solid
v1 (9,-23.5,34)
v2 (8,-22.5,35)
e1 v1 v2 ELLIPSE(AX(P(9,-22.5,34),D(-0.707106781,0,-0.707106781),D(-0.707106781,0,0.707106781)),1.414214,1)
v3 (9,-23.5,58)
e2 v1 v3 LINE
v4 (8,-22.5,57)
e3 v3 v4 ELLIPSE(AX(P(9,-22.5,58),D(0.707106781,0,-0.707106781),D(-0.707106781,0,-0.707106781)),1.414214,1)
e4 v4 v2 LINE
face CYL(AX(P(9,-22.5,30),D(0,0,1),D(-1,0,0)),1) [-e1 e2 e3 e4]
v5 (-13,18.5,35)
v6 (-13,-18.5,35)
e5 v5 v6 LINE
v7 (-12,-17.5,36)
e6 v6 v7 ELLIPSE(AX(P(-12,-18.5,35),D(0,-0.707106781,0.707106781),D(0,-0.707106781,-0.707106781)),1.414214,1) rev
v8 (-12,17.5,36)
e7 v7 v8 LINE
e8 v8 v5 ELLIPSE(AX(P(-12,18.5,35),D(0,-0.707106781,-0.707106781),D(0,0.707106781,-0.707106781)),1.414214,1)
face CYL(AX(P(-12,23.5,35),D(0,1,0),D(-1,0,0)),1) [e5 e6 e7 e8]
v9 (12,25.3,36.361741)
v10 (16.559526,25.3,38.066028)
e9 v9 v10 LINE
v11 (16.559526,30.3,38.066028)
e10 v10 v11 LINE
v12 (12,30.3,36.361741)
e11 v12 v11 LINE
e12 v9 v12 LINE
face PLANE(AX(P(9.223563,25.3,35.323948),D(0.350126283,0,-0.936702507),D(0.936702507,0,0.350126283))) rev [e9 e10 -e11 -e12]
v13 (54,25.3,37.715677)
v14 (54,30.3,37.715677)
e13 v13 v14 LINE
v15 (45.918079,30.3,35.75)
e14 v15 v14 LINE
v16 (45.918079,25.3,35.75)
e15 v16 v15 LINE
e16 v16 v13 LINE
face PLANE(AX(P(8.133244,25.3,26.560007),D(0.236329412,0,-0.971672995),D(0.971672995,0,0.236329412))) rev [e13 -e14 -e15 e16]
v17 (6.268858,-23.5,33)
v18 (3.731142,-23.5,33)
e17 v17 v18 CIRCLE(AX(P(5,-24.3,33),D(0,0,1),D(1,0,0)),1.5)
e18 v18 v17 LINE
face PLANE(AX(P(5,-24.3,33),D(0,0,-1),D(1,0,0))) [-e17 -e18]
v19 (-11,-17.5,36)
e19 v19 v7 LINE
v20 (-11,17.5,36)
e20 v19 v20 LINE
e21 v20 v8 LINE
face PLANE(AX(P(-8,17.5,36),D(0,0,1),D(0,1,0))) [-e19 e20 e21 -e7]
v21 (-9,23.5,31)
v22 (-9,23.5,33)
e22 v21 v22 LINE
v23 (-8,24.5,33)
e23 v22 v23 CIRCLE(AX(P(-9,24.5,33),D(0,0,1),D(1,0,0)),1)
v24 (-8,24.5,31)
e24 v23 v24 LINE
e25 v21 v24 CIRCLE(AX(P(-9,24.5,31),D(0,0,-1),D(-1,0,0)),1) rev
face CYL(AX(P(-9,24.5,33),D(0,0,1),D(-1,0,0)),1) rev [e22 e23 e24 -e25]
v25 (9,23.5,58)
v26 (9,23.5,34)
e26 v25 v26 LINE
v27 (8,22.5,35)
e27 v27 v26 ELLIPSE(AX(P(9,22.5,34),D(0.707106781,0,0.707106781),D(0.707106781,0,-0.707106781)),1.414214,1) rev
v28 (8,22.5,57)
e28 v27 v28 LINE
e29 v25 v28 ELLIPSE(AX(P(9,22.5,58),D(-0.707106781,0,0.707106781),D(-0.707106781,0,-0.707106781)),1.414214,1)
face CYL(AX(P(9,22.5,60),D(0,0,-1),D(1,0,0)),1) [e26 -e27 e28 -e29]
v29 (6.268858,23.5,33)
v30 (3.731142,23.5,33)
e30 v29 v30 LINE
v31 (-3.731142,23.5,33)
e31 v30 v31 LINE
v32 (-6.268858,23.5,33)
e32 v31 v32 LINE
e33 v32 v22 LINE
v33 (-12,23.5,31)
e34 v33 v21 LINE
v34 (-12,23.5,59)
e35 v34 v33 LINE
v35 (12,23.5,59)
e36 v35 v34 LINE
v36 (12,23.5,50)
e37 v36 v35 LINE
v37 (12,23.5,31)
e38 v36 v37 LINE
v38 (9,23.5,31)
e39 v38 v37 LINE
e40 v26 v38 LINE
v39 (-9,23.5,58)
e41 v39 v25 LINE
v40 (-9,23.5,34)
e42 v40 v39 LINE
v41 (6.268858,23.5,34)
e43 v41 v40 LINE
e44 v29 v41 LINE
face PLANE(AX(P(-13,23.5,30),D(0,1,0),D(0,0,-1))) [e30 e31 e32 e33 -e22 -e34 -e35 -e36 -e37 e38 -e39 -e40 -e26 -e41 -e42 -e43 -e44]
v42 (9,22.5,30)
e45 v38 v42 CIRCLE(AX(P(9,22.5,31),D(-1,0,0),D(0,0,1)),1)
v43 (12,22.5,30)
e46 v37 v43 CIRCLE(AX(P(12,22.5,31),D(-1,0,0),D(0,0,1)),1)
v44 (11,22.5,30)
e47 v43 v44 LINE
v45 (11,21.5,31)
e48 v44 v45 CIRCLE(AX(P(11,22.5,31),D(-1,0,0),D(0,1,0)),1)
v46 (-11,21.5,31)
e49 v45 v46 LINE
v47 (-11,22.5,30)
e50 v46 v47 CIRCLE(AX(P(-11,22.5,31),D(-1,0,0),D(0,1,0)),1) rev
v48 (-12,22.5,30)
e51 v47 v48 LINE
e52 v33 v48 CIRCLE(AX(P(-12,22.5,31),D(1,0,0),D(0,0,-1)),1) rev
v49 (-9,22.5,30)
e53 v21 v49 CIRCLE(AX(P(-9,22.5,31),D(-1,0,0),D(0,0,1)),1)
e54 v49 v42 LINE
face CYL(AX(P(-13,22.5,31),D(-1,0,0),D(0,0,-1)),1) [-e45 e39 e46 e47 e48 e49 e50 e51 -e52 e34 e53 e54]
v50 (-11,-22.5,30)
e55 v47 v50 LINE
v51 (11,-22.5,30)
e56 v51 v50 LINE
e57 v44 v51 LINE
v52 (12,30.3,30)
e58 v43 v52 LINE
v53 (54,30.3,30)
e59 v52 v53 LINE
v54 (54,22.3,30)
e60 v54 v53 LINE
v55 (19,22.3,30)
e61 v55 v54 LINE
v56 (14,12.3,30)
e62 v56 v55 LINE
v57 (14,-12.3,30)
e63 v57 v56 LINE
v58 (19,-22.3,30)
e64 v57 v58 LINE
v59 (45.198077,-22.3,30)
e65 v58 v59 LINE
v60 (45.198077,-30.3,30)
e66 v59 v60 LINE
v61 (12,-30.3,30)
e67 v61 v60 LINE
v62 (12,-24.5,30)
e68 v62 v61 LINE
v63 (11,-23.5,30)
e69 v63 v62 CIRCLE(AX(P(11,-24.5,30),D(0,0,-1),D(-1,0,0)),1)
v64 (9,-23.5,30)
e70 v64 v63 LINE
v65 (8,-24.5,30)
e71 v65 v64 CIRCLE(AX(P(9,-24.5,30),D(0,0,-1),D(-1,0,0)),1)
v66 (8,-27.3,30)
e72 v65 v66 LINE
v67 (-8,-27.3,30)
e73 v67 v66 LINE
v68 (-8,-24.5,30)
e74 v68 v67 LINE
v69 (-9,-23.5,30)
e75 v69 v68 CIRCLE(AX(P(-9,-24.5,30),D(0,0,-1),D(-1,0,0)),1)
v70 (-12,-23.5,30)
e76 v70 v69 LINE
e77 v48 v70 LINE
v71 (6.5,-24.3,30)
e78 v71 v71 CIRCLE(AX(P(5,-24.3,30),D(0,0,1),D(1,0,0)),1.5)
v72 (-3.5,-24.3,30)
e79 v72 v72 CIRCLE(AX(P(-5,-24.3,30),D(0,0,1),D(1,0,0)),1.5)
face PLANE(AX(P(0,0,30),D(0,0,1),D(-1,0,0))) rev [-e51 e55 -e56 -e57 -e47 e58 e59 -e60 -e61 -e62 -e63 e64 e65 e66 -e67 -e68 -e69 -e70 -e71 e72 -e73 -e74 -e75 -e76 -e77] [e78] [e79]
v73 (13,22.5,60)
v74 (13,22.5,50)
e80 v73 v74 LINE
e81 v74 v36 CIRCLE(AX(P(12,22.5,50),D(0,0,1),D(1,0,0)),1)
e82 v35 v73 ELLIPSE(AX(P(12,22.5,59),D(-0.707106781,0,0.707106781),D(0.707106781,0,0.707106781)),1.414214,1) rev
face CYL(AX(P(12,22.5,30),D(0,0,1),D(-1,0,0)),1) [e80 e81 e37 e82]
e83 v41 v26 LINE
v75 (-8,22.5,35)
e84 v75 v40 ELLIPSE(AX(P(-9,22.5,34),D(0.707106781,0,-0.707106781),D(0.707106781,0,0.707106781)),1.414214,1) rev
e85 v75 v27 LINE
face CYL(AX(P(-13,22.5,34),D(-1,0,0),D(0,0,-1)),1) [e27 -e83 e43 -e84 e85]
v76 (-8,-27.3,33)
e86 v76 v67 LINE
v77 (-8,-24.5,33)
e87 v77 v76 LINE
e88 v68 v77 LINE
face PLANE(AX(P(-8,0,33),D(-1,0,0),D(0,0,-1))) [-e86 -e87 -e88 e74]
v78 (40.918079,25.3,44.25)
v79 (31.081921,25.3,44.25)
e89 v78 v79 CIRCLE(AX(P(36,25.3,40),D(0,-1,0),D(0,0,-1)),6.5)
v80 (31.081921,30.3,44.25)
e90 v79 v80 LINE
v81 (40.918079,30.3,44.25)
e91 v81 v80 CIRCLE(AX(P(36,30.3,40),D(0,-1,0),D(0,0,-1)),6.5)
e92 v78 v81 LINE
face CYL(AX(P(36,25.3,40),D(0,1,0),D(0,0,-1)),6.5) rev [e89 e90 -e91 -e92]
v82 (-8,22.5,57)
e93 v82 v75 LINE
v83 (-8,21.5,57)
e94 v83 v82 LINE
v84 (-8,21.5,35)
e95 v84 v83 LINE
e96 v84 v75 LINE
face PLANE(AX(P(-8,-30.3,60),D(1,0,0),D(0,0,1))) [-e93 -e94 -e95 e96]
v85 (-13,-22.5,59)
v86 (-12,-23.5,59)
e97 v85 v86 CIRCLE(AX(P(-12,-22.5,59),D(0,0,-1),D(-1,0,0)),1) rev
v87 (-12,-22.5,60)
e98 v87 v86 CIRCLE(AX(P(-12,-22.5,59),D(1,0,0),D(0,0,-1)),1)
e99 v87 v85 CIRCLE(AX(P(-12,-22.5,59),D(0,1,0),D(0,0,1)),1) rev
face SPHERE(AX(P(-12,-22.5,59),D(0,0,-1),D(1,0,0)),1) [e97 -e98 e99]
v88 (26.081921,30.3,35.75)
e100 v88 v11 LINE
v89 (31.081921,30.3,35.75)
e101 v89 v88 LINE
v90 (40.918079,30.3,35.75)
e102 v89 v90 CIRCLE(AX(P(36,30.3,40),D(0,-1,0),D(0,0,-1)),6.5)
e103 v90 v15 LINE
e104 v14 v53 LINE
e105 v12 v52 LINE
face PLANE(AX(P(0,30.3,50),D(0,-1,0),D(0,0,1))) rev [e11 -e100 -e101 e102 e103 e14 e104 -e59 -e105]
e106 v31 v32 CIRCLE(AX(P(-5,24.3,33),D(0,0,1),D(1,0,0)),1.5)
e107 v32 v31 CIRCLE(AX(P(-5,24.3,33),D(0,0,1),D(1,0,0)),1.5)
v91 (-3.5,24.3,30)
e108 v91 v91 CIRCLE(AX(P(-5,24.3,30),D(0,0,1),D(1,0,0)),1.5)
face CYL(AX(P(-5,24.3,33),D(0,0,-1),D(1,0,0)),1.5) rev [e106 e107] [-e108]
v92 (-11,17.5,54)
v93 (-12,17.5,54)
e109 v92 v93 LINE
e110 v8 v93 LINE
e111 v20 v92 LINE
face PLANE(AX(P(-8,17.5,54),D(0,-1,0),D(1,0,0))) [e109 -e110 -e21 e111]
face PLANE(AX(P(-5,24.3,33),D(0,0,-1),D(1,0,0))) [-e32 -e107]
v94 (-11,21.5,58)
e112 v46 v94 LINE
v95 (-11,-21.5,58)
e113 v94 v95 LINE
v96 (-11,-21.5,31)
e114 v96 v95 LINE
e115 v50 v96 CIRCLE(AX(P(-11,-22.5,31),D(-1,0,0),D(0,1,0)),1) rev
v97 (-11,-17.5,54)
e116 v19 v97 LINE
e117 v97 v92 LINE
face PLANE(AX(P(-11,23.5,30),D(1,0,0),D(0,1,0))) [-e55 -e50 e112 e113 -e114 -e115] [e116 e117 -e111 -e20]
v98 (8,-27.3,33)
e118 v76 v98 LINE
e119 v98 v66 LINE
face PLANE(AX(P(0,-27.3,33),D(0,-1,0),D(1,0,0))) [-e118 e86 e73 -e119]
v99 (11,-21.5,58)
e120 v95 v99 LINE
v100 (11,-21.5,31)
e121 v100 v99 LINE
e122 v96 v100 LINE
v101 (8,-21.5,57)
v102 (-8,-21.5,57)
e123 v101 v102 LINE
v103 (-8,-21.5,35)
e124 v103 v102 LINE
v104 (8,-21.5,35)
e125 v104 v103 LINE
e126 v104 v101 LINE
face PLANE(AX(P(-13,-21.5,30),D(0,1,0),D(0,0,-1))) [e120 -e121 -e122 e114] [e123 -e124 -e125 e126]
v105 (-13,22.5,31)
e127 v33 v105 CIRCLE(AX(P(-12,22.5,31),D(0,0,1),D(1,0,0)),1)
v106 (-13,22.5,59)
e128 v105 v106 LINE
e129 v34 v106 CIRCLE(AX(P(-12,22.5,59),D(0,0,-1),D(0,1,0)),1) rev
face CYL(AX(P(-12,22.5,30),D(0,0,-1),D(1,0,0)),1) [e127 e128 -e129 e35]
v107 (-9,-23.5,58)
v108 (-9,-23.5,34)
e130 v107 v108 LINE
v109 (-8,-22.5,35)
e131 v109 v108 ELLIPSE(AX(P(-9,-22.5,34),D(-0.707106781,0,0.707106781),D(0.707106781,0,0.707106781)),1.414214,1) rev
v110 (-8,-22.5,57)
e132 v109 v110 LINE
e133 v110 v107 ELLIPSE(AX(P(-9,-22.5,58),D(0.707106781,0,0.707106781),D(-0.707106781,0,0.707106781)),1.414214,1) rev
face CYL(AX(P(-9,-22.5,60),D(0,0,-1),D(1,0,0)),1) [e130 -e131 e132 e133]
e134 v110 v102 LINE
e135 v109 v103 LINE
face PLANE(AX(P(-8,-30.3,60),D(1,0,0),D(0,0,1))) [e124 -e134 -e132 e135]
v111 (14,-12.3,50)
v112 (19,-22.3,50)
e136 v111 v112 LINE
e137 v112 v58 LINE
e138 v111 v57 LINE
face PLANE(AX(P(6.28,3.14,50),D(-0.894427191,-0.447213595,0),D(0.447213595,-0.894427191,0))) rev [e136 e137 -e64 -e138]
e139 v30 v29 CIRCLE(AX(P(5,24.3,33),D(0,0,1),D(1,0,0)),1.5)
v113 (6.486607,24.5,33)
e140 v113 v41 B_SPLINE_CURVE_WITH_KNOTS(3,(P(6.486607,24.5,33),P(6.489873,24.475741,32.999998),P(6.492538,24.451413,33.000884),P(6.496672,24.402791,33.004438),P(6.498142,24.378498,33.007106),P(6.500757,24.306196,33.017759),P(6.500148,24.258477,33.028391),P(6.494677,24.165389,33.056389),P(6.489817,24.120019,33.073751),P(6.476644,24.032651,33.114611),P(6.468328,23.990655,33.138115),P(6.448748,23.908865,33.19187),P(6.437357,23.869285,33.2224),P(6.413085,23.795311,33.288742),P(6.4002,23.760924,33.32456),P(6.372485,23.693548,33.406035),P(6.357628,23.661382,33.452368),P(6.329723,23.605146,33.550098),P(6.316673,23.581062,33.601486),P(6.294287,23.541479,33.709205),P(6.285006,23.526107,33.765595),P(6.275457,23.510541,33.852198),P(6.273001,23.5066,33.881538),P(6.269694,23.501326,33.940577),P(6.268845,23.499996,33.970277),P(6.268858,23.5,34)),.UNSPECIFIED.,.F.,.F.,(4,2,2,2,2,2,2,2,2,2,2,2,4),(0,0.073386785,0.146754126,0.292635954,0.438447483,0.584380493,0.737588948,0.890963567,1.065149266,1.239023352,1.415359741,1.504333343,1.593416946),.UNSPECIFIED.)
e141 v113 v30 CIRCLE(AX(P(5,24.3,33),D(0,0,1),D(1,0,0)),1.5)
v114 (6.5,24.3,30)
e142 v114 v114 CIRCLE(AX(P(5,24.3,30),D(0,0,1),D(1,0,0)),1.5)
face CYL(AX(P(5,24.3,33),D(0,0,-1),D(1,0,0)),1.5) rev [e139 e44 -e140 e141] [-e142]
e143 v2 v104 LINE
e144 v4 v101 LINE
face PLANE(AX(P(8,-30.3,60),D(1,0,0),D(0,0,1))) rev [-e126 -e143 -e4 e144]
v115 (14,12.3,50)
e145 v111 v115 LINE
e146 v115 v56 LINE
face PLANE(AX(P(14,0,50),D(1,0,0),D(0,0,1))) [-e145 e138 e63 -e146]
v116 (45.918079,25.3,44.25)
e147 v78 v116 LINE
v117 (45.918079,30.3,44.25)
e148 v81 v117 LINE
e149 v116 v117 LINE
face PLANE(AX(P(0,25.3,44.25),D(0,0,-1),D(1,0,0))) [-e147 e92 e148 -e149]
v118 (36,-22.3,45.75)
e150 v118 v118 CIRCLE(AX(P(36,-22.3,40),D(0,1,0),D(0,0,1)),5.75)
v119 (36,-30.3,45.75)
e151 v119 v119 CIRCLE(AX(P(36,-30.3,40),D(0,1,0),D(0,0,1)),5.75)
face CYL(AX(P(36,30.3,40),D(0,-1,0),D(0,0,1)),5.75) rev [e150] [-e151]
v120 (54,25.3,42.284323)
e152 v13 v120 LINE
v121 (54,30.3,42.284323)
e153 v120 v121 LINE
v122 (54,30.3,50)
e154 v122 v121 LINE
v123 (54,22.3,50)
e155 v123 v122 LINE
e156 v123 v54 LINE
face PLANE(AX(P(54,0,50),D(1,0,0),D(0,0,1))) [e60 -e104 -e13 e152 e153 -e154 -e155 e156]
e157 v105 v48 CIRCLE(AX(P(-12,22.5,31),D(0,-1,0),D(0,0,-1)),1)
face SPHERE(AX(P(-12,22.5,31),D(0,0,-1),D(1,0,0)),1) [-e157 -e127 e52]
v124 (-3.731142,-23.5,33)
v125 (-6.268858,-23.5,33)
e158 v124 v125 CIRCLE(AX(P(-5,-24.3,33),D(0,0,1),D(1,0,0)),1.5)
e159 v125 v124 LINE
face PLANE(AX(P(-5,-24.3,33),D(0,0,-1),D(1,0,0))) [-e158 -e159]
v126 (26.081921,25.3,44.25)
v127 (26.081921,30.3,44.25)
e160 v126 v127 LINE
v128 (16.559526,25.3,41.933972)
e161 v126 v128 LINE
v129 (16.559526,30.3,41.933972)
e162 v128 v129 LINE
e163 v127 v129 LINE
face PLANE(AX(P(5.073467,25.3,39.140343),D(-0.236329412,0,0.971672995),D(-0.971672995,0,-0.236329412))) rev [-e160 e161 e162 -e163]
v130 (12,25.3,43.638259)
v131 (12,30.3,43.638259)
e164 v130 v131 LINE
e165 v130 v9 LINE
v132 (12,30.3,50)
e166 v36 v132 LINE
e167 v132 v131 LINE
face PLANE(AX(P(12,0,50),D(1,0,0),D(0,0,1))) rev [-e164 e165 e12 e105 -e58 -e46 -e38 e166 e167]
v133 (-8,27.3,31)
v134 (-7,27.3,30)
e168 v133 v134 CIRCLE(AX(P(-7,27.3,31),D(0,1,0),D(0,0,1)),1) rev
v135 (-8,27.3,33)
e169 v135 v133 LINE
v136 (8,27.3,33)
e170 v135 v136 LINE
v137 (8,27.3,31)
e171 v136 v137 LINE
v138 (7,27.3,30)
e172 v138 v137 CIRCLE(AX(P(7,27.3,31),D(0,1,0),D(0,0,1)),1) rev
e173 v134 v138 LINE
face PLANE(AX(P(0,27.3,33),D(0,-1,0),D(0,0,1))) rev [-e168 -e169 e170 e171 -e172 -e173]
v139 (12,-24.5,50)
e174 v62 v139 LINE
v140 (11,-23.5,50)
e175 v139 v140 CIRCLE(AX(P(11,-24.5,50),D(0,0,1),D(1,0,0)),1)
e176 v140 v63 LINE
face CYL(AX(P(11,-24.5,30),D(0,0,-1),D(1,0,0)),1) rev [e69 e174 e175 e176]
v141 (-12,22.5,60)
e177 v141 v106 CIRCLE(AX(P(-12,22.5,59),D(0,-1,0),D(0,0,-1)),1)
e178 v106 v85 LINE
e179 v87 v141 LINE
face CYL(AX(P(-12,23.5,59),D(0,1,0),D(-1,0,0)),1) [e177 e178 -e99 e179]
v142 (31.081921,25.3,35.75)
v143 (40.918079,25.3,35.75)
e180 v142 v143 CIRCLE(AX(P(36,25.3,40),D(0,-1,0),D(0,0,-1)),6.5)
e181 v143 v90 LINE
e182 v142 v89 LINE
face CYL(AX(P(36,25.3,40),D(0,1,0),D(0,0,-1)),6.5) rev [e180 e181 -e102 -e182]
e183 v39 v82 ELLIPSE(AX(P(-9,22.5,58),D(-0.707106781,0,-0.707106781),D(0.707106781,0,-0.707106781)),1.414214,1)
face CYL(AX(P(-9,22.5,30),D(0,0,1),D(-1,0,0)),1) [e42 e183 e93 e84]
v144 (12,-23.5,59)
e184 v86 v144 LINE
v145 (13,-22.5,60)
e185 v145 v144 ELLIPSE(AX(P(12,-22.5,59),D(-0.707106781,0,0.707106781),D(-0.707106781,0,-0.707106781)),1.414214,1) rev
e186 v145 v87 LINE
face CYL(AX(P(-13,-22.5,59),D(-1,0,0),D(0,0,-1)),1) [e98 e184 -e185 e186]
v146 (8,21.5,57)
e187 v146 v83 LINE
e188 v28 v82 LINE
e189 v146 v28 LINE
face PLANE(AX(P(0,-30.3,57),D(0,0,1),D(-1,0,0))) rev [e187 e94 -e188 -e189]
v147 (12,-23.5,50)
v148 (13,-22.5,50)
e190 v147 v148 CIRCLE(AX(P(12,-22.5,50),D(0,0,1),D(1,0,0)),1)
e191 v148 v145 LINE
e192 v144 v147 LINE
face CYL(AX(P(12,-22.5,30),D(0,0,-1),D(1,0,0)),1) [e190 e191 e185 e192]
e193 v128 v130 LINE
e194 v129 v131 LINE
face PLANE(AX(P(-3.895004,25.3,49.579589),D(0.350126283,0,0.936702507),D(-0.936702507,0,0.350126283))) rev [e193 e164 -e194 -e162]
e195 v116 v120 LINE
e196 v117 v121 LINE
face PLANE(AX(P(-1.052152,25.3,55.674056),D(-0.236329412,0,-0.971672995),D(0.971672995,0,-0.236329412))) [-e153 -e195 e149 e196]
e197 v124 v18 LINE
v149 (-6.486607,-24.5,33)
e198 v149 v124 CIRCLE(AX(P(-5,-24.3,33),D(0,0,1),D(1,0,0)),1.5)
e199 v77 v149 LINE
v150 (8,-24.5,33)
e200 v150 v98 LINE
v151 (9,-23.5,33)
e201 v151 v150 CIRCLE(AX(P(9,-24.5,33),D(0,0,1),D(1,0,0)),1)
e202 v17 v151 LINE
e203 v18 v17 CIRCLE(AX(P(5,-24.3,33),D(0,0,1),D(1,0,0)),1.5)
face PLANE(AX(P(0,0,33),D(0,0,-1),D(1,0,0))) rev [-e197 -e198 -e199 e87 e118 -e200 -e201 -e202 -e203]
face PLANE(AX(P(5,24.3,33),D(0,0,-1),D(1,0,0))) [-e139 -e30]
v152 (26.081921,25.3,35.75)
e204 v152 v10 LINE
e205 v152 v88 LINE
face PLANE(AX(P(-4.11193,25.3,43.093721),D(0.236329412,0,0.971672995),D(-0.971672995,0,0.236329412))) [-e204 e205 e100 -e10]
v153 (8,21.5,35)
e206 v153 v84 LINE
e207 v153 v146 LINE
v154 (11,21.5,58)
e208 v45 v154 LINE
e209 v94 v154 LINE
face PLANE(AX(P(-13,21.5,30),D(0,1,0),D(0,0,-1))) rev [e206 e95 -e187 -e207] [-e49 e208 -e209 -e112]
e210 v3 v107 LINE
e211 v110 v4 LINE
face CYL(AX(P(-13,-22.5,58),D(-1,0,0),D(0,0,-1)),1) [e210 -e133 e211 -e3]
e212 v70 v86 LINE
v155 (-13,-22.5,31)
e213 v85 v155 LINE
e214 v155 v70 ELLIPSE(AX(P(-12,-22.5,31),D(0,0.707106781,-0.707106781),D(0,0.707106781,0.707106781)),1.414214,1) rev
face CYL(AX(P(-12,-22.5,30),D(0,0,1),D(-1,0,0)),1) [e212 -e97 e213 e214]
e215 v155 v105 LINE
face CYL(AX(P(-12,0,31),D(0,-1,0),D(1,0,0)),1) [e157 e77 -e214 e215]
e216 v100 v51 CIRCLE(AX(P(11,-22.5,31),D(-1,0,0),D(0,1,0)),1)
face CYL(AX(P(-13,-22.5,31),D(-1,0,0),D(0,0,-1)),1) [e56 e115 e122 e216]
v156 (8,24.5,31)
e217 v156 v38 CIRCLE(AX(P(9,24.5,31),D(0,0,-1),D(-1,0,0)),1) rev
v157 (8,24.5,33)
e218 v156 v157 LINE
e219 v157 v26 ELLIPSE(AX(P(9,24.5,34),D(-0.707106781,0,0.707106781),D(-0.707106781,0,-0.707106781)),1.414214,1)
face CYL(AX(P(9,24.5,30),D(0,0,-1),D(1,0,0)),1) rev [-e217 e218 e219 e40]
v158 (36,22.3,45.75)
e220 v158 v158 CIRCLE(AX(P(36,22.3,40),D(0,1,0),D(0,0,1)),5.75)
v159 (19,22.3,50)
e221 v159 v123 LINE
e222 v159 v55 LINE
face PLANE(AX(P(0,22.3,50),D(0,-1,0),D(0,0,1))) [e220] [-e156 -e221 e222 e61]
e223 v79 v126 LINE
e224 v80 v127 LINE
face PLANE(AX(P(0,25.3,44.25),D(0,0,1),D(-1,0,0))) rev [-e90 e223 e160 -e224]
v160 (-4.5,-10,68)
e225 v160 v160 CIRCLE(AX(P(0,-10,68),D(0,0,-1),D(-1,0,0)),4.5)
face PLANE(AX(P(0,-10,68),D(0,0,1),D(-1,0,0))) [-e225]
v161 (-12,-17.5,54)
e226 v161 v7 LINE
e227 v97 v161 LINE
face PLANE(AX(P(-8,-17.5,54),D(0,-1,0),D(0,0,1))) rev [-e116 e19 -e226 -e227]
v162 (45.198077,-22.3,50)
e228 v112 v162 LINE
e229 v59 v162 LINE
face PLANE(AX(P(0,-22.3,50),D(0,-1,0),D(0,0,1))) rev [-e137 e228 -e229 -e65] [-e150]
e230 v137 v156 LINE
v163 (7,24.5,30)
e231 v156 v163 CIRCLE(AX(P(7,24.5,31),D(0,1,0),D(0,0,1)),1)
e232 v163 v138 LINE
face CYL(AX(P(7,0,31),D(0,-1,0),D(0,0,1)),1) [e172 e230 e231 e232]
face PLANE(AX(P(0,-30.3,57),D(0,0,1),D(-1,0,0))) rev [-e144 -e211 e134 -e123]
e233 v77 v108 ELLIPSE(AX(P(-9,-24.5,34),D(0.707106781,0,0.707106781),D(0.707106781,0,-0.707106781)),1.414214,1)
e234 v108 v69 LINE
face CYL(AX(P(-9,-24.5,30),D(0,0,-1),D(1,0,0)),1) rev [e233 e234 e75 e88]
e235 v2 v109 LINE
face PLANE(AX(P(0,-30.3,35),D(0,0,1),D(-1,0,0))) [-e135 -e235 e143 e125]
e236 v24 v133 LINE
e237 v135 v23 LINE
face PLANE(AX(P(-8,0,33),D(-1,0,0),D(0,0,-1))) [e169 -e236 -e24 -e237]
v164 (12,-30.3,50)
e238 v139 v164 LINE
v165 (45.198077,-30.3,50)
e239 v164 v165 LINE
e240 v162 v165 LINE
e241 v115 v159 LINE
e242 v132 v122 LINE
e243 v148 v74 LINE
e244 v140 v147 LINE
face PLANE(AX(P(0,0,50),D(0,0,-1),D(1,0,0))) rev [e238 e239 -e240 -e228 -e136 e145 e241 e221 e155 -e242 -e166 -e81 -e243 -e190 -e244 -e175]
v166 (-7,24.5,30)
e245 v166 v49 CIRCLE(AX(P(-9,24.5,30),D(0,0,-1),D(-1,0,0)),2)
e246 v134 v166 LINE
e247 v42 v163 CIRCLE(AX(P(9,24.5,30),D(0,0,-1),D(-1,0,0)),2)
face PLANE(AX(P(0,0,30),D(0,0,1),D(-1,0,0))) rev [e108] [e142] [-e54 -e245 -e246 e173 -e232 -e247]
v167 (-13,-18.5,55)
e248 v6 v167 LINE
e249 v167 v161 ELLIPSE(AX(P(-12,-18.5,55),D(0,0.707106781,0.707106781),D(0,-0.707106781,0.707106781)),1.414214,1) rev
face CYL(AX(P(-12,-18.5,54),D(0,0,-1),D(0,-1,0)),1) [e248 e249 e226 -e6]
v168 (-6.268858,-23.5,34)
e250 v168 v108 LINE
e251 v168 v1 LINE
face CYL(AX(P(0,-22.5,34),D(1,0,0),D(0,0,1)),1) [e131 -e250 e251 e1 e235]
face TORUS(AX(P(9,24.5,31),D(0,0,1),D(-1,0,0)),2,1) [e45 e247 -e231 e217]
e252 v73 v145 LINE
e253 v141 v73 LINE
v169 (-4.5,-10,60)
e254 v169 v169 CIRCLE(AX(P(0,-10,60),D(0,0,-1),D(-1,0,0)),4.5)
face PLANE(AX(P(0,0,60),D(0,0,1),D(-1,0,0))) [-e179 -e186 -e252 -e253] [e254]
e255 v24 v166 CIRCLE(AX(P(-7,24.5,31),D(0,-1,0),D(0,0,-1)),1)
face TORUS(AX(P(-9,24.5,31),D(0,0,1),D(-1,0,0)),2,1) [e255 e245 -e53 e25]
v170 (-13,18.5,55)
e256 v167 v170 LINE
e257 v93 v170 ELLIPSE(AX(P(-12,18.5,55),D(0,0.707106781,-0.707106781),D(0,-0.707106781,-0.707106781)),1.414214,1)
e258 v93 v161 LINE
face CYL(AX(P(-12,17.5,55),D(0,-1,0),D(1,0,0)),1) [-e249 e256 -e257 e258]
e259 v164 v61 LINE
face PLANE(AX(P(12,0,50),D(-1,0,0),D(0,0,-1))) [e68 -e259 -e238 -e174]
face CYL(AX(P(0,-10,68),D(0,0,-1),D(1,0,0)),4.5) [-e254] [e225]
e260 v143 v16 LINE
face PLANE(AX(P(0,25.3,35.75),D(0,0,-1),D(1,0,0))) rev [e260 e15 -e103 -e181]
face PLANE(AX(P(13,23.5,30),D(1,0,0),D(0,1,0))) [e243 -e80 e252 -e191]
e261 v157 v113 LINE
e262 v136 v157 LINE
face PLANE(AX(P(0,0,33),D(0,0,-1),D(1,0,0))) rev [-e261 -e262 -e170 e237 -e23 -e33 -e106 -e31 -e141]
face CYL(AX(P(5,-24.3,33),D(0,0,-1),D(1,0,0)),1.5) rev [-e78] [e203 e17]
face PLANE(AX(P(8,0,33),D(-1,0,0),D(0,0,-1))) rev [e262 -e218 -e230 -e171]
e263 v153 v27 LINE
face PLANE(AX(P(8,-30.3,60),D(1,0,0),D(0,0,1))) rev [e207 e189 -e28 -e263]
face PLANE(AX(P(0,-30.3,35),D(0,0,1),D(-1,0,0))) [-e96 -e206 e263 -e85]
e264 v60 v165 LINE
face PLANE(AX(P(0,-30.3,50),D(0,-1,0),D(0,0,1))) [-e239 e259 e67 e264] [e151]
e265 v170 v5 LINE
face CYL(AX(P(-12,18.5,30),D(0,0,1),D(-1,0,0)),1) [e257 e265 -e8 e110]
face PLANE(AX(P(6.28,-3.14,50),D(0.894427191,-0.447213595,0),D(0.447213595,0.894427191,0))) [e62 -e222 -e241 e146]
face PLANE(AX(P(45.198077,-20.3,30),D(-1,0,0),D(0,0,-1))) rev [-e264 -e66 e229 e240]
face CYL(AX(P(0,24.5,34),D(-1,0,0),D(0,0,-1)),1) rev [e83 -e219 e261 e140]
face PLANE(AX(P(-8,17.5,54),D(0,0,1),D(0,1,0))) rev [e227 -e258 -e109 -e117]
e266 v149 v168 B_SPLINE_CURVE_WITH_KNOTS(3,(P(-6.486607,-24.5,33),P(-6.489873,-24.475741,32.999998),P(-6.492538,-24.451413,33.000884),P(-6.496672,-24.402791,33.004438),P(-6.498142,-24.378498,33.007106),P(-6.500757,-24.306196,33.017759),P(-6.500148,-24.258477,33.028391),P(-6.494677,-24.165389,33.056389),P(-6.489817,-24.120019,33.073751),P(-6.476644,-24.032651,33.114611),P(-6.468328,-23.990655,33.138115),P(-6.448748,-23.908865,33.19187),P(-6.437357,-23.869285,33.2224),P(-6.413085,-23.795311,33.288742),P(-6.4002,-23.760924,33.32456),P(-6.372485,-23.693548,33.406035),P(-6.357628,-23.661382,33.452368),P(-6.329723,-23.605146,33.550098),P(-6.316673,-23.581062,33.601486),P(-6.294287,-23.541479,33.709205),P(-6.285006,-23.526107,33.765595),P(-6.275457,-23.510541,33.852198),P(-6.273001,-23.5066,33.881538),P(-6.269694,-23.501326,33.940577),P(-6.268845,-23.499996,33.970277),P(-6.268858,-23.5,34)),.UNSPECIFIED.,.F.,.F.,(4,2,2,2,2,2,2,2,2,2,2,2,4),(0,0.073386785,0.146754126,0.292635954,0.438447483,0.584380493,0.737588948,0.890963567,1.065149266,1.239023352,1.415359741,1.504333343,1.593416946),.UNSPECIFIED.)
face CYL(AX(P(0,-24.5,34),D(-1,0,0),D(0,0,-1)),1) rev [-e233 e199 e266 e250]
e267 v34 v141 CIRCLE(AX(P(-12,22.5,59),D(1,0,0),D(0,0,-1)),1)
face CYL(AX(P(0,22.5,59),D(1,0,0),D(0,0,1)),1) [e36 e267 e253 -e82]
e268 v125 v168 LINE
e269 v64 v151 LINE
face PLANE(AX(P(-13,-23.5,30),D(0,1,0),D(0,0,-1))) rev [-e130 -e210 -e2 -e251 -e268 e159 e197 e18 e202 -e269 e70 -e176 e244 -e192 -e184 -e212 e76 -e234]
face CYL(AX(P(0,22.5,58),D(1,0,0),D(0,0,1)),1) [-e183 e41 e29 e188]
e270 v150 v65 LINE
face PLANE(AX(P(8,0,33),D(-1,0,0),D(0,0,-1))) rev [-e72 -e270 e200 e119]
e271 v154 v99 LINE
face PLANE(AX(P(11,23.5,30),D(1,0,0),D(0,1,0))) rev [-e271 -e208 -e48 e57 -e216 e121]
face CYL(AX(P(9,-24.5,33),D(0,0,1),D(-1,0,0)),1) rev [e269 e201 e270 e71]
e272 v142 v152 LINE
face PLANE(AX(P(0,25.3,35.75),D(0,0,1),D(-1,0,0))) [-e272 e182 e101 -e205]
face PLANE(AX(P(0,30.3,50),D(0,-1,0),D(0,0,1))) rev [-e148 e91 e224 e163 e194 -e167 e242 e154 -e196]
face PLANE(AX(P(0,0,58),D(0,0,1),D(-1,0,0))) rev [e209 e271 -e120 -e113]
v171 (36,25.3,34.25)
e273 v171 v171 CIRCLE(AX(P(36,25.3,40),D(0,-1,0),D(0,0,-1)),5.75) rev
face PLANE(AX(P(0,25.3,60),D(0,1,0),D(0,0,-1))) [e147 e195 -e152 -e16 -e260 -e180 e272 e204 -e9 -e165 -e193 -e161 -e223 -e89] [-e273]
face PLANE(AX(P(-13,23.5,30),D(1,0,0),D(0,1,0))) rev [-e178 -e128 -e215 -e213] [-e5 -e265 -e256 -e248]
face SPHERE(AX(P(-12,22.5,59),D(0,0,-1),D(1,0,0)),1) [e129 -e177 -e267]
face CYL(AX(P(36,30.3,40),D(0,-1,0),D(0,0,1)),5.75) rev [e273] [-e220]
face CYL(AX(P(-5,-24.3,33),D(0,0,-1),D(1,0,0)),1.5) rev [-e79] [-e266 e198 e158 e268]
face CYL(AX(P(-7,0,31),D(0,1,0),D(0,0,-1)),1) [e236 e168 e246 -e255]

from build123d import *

# Parameters (mm, degrees)
SKETCH1_W               = 26
SKETCH1_H               = 47
BOSS_EXTRUDE1_DEPTH     = 30
SHELL1_T                = -2
SKETCH2_W               = 10
SKETCH2_H               = 0.8
BOSS_EXTRUDE2_DEPTH     = 3
SKETCH3_R               = 1.5
CUT_EXTRUDE1_DEPTH      = 3
BOSS_EXTRUDE3_DEPTH     = 20
CUT_EXTRUDE2_DEPTH      = 82.134209801
CUT_EXTRUDE2_DEPTH_BACK = 82.134209801
SKETCH6_R               = 4.5
BOSS_EXTRUDE4_DEPTH     = 8
CUT_EXTRUDE3_DEPTH      = 82.917275345
CUT_EXTRUDE3_DEPTH_BACK = 82.917275345
SKETCH9_R               = 5.75
CUT_EXTRUDE4_DEPTH      = 5
SKETCH10_W              = 18
SKETCH10_H              = 35
CUT_EXTRUDE5_DEPTH      = 5
FILLET1_R               = 1
FILLET2_R               = 1
FILLET3_R               = 1
FILLET5_R               = 1
FILLET6_R               = 1
SKETCH11_W              = 8.801922924
SKETCH11_H              = 20
CUT_EXTRUDE6_DEPTH      = 10
SKETCH12_R              = 109.313079142
CUT_EXTRUDE7_DEPTH      = 73.650464555


# Some blends are built 0.0001 mm under size
with BuildPart() as part:
    # Sketch1 → Boss-Extrude1 (new body)
    with BuildSketch(Plane.XY):
        Rectangle(SKETCH1_W, SKETCH1_H)
    extrude(amount=BOSS_EXTRUDE1_DEPTH)

    # Shell1
    shell1_openings = [part.faces().sort_by_distance(p)[0] for p in [
        (0, 0, 30),
    ]]
    offset(amount=SHELL1_T, openings=shell1_openings, kind=Kind.INTERSECTION)

    # Sketch2 → Boss-Extrude2 (add)
    with BuildSketch(Plane.XY.offset(30)):
        Polygon((-5, 23.5), (-5, 24.3), (5, 24.3), (5, 23.5), (8, 23.5), (8, 27.3), (-8, 27.3), (-8, 23.5), align=None)
        with Locations((0, 23.9)):
            Rectangle(SKETCH2_W, SKETCH2_H)
        Polygon((-5, -24.3), (-5, -23.5), (-8, -23.5), (-8, -27.3), (8, -27.3), (8, -23.5), (5, -23.5), (5, -24.3), align=None)
        with Locations((0, -23.9)):
            Rectangle(SKETCH2_W, SKETCH2_H)
    extrude(amount=-BOSS_EXTRUDE2_DEPTH)

    # Sketch3 → Cut-Extrude1 (cut)
    with BuildSketch(Plane.XY.offset(30)):
        with Locations((-5, -24.3)):
            Circle(SKETCH3_R)
        with Locations((5, -24.3)):
            Circle(SKETCH3_R)
        with Locations((5, 24.3)):
            Circle(SKETCH3_R)
        with Locations((-5, 24.3)):
            Circle(SKETCH3_R)
    extrude(amount=-CUT_EXTRUDE1_DEPTH, mode=Mode.SUBTRACT)

    # Sketch4 → Boss-Extrude3 (add)
    with BuildSketch(Plane.XY.offset(30)):
        Polygon((13, 23.5), (13, -23.5), (12, -23.5), (12, -30.3), (54, -30.3), (54, -22.3), (19, -22.3), (14, -12.3), (14, 12.3), (19, 22.3), (54, 22.3), (54, 30.3), (12, 30.3), (12, 23.5), align=None)
    extrude(amount=-BOSS_EXTRUDE3_DEPTH)

    # Sketch5 → Cut-Extrude2 (cut, two sides: drawn at the far end of the back side and taken through both)
    with BuildSketch(Plane(origin=(0, 22.3, 0), x_dir=(-1, 0, 0), z_dir=(0, -1, 0)).offset(-CUT_EXTRUDE2_DEPTH_BACK)):
        with BuildLine():
            ThreePointArc((-36, -14.25), (-41.75, -20), (-36, -25.75))
            Line((-36, -25.75), (-36, -14.25))
        make_face()
        with BuildLine():
            Line((-36, -14.25), (-36, -25.75))
            ThreePointArc((-36, -25.75), (-31.934136008, -24.065863992), (-30.25, -20))
            ThreePointArc((-30.25, -20), (-31.934136008, -15.934136008), (-36, -14.25))
        make_face()
    extrude(amount=CUT_EXTRUDE2_DEPTH + CUT_EXTRUDE2_DEPTH_BACK, mode=Mode.SUBTRACT)

    # Sketch6 → Boss-Extrude4 (add)
    with BuildSketch(Plane(origin=(0, 0, 0), x_dir=(-1, 0, 0), z_dir=(0, 0, -1))):
        with Locations((0, -10)):
            Circle(SKETCH6_R)
    extrude(amount=BOSS_EXTRUDE4_DEPTH)

    # Sketch7 → Cut-Extrude3 (cut, two sides: drawn at the far end of the back side and taken through both)
    with BuildSketch(Plane(origin=(0, 23.5, 0), x_dir=(1, 0, 0), z_dir=(0, 1, 0)).offset(-CUT_EXTRUDE3_DEPTH_BACK)):
        Polygon((-8, -25), (8, -25), (8, -23), (8, -5), (8, -3), (-8, -3), (-8, -5), (-8, -23), align=None)
    extrude(amount=CUT_EXTRUDE3_DEPTH + CUT_EXTRUDE3_DEPTH_BACK, mode=Mode.SUBTRACT)

    # Sketch9 → Cut-Extrude4 (cut)
    with BuildSketch(Plane(origin=(0, 30.3, 0), x_dir=(1, 0, 0), z_dir=(0, 1, 0))):
        with BuildLine():
            Line((31.081921107, -15.75), (26.081921107, -15.75))
            Line((26.081921107, -15.75), (16.559525756, -18.066028235))
            Line((16.559525756, -18.066028235), (12, -16.361741342))
            Line((12, -16.361741342), (12, -23.638258658))
            Line((12, -23.638258658), (16.559525756, -21.933971765))
            Line((16.559525756, -21.933971765), (26.081921107, -24.25))
            Line((26.081921107, -24.25), (31.081921107, -24.25))
            ThreePointArc((31.081921107, -24.25), (36, -26.5), (40.918078893, -24.25))
            Line((40.918078893, -24.25), (45.918078893, -24.25))
            Line((45.918078893, -24.25), (54, -22.284322585))
            Line((54, -22.284322585), (54, -17.715677415))
            Line((54, -17.715677415), (45.918078893, -15.75))
            Line((45.918078893, -15.75), (40.918078893, -15.75))
            ThreePointArc((40.918078893, -15.75), (36, -13.5), (31.081921107, -15.75))
        make_face()
        with Locations(Location((36, -20, 0), (0, 0, 90))):
            Circle(SKETCH9_R, mode=Mode.SUBTRACT)
    extrude(amount=-CUT_EXTRUDE4_DEPTH, mode=Mode.SUBTRACT)

    # Sketch10 → Cut-Extrude5 (cut)
    with BuildSketch(Plane.ZY.offset(13)):
        with Locations((15, 0)):
            Rectangle(SKETCH10_W, SKETCH10_H)
    extrude(amount=-CUT_EXTRUDE5_DEPTH, mode=Mode.SUBTRACT)

    # Fillet1
    fillet1_edges = [part.edges().sort_by_distance(p)[0] for p in [
        (0, -21.5, 30),
        (-13, 17.5, 15),
        (-13, 0, 24),
        (-13, 0, 6),
        (-13, -17.5, 15),
    ]]
    fillet(fillet1_edges, radius=FILLET1_R)

    # Fillet2
    # the kernel refuses this fillet: 1 mm, written as the material it adds along each edge
    with BuildSketch(Plane(origin=(8, 23.5, 30), x_dir=(1, 0, 0), z_dir=(0, 0, -1))) as fillet2_piece_1:
        with BuildLine():
            CenterArc((FILLET2_R, -FILLET2_R), FILLET2_R, 90, 90)
            Line((0, -FILLET2_R), (-FILLET2_R * 0.02, -FILLET2_R))
            Line((-FILLET2_R * 0.02, -FILLET2_R), (-FILLET2_R * 0.02, FILLET2_R * 0.02))
            Line((-FILLET2_R * 0.02, FILLET2_R * 0.02), (FILLET2_R, FILLET2_R * 0.02))
            Line((FILLET2_R, FILLET2_R * 0.02), (FILLET2_R, 0))
        make_face()
    extrude(amount=3)
    with BuildSketch(Plane(origin=(-8, 23.5, 30), x_dir=(-1, 0, 0), z_dir=(0, 0, -1))) as fillet2_piece_2:
        with BuildLine():
            CenterArc((FILLET2_R, FILLET2_R), FILLET2_R, 180, 90)
            Line((0, FILLET2_R), (-FILLET2_R * 0.02, FILLET2_R))
            Line((-FILLET2_R * 0.02, FILLET2_R), (-FILLET2_R * 0.02, -FILLET2_R * 0.02))
            Line((-FILLET2_R * 0.02, -FILLET2_R * 0.02), (FILLET2_R, -FILLET2_R * 0.02))
            Line((FILLET2_R, -FILLET2_R * 0.02), (FILLET2_R, 0))
        make_face()
    extrude(amount=3)
    with BuildSketch(Plane(origin=(3.768857754, 23.5, 27), x_dir=(0, 0, -1), z_dir=(1, 0, 0))) as fillet2_piece_3_section:
        with BuildLine():
            CenterArc((FILLET2_R, FILLET2_R), FILLET2_R, 180, 90)
            Line((0, FILLET2_R), (-FILLET2_R * 0.02, FILLET2_R))
            Line((-FILLET2_R * 0.02, FILLET2_R), (-FILLET2_R * 0.02, -FILLET2_R * 0.02))
            Line((-FILLET2_R * 0.02, -FILLET2_R * 0.02), (FILLET2_R, -FILLET2_R * 0.02))
            Line((FILLET2_R, -FILLET2_R * 0.02), (FILLET2_R, 0))
        make_face()
    fillet2_piece_3 = extrude(amount=4.231142246, mode=Mode.PRIVATE)
    fillet2_piece_3 = split(fillet2_piece_3, bisect_by=Plane(origin=(7.179036581, 23.695460756, 27), z_dir=(0, 0, -1)), keep=Keep.TOP, mode=Mode.PRIVATE)
    fillet2_piece_3 = fillet2_piece_3 - Plane(origin=(5, 24.3, 26.747269996), x_dir=(1, 0, 0), z_dir=(0, 0, 1)) * Cylinder(1.5, 13, mode=Mode.PRIVATE)
    add(fillet2_piece_3)
    with BuildSketch(Plane(origin=(12, -23.5, 30), x_dir=(0, -1, 0), z_dir=(0, 0, -1))) as fillet2_piece_4:
        with BuildLine():
            CenterArc((FILLET2_R, FILLET2_R), FILLET2_R, 180, 90)
            Line((0, FILLET2_R), (-FILLET2_R * 0.02, FILLET2_R))
            Line((-FILLET2_R * 0.02, FILLET2_R), (-FILLET2_R * 0.02, -FILLET2_R * 0.02))
            Line((-FILLET2_R * 0.02, -FILLET2_R * 0.02), (FILLET2_R, -FILLET2_R * 0.02))
            Line((FILLET2_R, -FILLET2_R * 0.02), (FILLET2_R, 0))
        make_face()
    extrude(amount=20)
    with BuildSketch(Plane(origin=(8, 23.5, 30), x_dir=(1, 0, 0), z_dir=(0, 0, -1))) as fillet2_piece_5a_section:
        with BuildLine():
            CenterArc((FILLET2_R, -FILLET2_R), FILLET2_R, 90, 90)
            Line((0, -FILLET2_R), (-FILLET2_R * 0.02, -FILLET2_R))
            Line((-FILLET2_R * 0.02, -FILLET2_R), (-FILLET2_R * 0.02, FILLET2_R * 0.02))
            Line((-FILLET2_R * 0.02, FILLET2_R * 0.02), (FILLET2_R, FILLET2_R * 0.02))
            Line((FILLET2_R, FILLET2_R * 0.02), (FILLET2_R, 0))
        make_face()
    fillet2_piece_5a = extrude(amount=5.5, mode=Mode.PRIVATE)
    fillet2_piece_5a = split(fillet2_piece_5a, bisect_by=Plane(origin=(8.226395114, 23.726395114, 27), z_dir=(0, 0, -1)), keep=Keep.TOP, mode=Mode.PRIVATE)
    with BuildSketch(Plane(origin=(3.768857754, 23.5, 27), x_dir=(0, 0, -1), z_dir=(1, 0, 0))) as fillet2_piece_5b_section:
        with BuildLine():
            CenterArc((FILLET2_R, FILLET2_R), FILLET2_R, 180, 90)
            Line((0, FILLET2_R), (-FILLET2_R * 0.02, FILLET2_R))
            Line((-FILLET2_R * 0.02, FILLET2_R), (-FILLET2_R * 0.02, -FILLET2_R * 0.02))
            Line((-FILLET2_R * 0.02, -FILLET2_R * 0.02), (FILLET2_R, -FILLET2_R * 0.02))
            Line((FILLET2_R, -FILLET2_R * 0.02), (FILLET2_R, 0))
        make_face()
    fillet2_piece_5b = extrude(amount=6.731142246, mode=Mode.PRIVATE)
    fillet2_piece_5b = split(fillet2_piece_5b, bisect_by=Plane(origin=(9.25, 23.70347313, 27), z_dir=(0, 0, -1)), keep=Keep.TOP, mode=Mode.PRIVATE)
    fillet2_piece_5b = split(fillet2_piece_5b, bisect_by=Plane(origin=(8, 23.70347313, 26.75304895), z_dir=(1, 0, 0)), keep=Keep.TOP, mode=Mode.PRIVATE)
    fillet2_piece_5 = fillet2_piece_5a & fillet2_piece_5b
    add(fillet2_piece_5)

    # Fillet3
    # the kernel refuses this fillet: 1 mm, written as the material it adds along each edge
    with BuildSketch(Plane(origin=(-8, -23.5, 30), x_dir=(-1, 0, 0), z_dir=(0, 0, -1))) as fillet3_piece_1:
        with BuildLine():
            CenterArc((FILLET3_R, -FILLET3_R), FILLET3_R, 90, 90)
            Line((0, -FILLET3_R), (-FILLET3_R * 0.02, -FILLET3_R))
            Line((-FILLET3_R * 0.02, -FILLET3_R), (-FILLET3_R * 0.02, FILLET3_R * 0.02))
            Line((-FILLET3_R * 0.02, FILLET3_R * 0.02), (FILLET3_R, FILLET3_R * 0.02))
            Line((FILLET3_R, FILLET3_R * 0.02), (FILLET3_R, 0))
        make_face()
    extrude(amount=3)
    with BuildSketch(Plane(origin=(8, -23.5, 30), x_dir=(1, 0, 0), z_dir=(0, 0, -1))) as fillet3_piece_2:
        with BuildLine():
            CenterArc((FILLET3_R, FILLET3_R), FILLET3_R, 180, 90)
            Line((0, FILLET3_R), (-FILLET3_R * 0.02, FILLET3_R))
            Line((-FILLET3_R * 0.02, FILLET3_R), (-FILLET3_R * 0.02, -FILLET3_R * 0.02))
            Line((-FILLET3_R * 0.02, -FILLET3_R * 0.02), (FILLET3_R, -FILLET3_R * 0.02))
            Line((FILLET3_R, -FILLET3_R * 0.02), (FILLET3_R, 0))
        make_face()
    extrude(amount=3)
    with BuildSketch(Plane(origin=(-3.768857754, -23.5, 27), x_dir=(0, 0, -1), z_dir=(-1, 0, 0))) as fillet3_piece_3_section:
        with BuildLine():
            CenterArc((FILLET3_R, FILLET3_R), FILLET3_R, 180, 90)
            Line((0, FILLET3_R), (-FILLET3_R * 0.02, FILLET3_R))
            Line((-FILLET3_R * 0.02, FILLET3_R), (-FILLET3_R * 0.02, -FILLET3_R * 0.02))
            Line((-FILLET3_R * 0.02, -FILLET3_R * 0.02), (FILLET3_R, -FILLET3_R * 0.02))
            Line((FILLET3_R, -FILLET3_R * 0.02), (FILLET3_R, 0))
        make_face()
    fillet3_piece_3 = extrude(amount=4.231142246, mode=Mode.PRIVATE)
    fillet3_piece_3 = split(fillet3_piece_3, bisect_by=Plane(origin=(-7.179037039, -23.695460726, 27), z_dir=(0, 0, -1)), keep=Keep.TOP, mode=Mode.PRIVATE)
    fillet3_piece_3 = fillet3_piece_3 - Plane(origin=(-5, -24.3, 26.747269962), x_dir=(1, 0, 0), z_dir=(0, 0, 1)) * Cylinder(1.5, 13, mode=Mode.PRIVATE)
    add(fillet3_piece_3)
    with BuildSketch(Plane(origin=(-3.768857754, -23.5, 27), x_dir=(0, 0, -1), z_dir=(-1, 0, 0))) as fillet3_piece_4a_section:
        with BuildLine():
            CenterArc((FILLET3_R, FILLET3_R), FILLET3_R, 180, 90)
            Line((0, FILLET3_R), (-FILLET3_R * 0.02, FILLET3_R))
            Line((-FILLET3_R * 0.02, FILLET3_R), (-FILLET3_R * 0.02, -FILLET3_R * 0.02))
            Line((-FILLET3_R * 0.02, -FILLET3_R * 0.02), (FILLET3_R, -FILLET3_R * 0.02))
            Line((FILLET3_R, -FILLET3_R * 0.02), (FILLET3_R, 0))
        make_face()
    fillet3_piece_4a = extrude(amount=6.731142246, mode=Mode.PRIVATE)
    fillet3_piece_4a = split(fillet3_piece_4a, bisect_by=Plane(origin=(-9.25, -23.70347313, 27), z_dir=(0, 0, -1)), keep=Keep.TOP, mode=Mode.PRIVATE)
    fillet3_piece_4a = split(fillet3_piece_4a, bisect_by=Plane(origin=(-8, -23.70347313, 26.75304895), z_dir=(-1, 0, 0)), keep=Keep.TOP, mode=Mode.PRIVATE)
    with BuildSketch(Plane(origin=(-8, -23.5, 30), x_dir=(-1, 0, 0), z_dir=(0, 0, -1))) as fillet3_piece_4b_section:
        with BuildLine():
            CenterArc((FILLET3_R, -FILLET3_R), FILLET3_R, 90, 90)
            Line((0, -FILLET3_R), (-FILLET3_R * 0.02, -FILLET3_R))
            Line((-FILLET3_R * 0.02, -FILLET3_R), (-FILLET3_R * 0.02, FILLET3_R * 0.02))
            Line((-FILLET3_R * 0.02, FILLET3_R * 0.02), (FILLET3_R, FILLET3_R * 0.02))
            Line((FILLET3_R, FILLET3_R * 0.02), (FILLET3_R, 0))
        make_face()
    fillet3_piece_4b = extrude(amount=5.5, mode=Mode.PRIVATE)
    fillet3_piece_4b = split(fillet3_piece_4b, bisect_by=Plane(origin=(-8.226395114, -23.726395114, 27), z_dir=(0, 0, -1)), keep=Keep.TOP, mode=Mode.PRIVATE)
    fillet3_piece_4 = fillet3_piece_4a & fillet3_piece_4b
    add(fillet3_piece_4)

    # Fillet5
    fillet5_edges = [part.edges().sort_by_distance(p)[0] for p in [
        (-8, 25.9, 30),
        (-8.292893219, 23.792893219, 30),
        (-13, 23.5, 15),
        (-13, 0, 0),
        (13, 23.5, 5),
        (-11, 23.5, 30),
        (-13, -23.5, 15),
        (0, -23.5, 0),
        (13, -23.5, 5),
        (-13, 0, 30),
        (0, 23.5, 0),
        (10.5, 23.5, 30),
        (8, 25.9, 30),
        (0, -23.5, 25),
        (-8, -23.5, 14),
        (0, -23.5, 3),
        (8, -23.5, 14),
        (-8, 23.5, 14),
        (0, 23.5, 25),
        (8, 23.5, 14),
        (0, 23.5, 3),
        (8.292893219, 23.792893219, 30),
    ]]
    fillet(fillet5_edges, radius=FILLET5_R - 0.0001)  # a hair under: the kernel refuses the full size

    # Fillet6
    fillet6_edges = [part.edges().sort_by_distance(p)[0] for p in [
        (0, 21.5, 30),
    ]]
    fillet(fillet6_edges, radius=FILLET6_R)

    # Sketch11 → Cut-Extrude6 (cut)
    with BuildSketch(Plane.XZ.offset(30.3)):
        with Locations((49.599038538, 20)):
            Rectangle(SKETCH11_W, SKETCH11_H)
    extrude(amount=-CUT_EXTRUDE6_DEPTH, mode=Mode.SUBTRACT)


with BuildPart() as body_2:
    # Mirror2: mirrored copy
    add(part.part.mirror(Plane(origin=(0, 0, 30), x_dir=(1, 0, 0), z_dir=(0, 0, -1))))


with BuildPart() as part_1:
    add(part.part)

    # Sketch12 → Cut-Extrude7 (cut, through all)
    with BuildSketch(Plane(origin=(0, 0, 30), x_dir=(-1, 0, 0), z_dir=(0, 0, -1))):
        Circle(SKETCH12_R)
    extrude(amount=CUT_EXTRUDE7_DEPTH, mode=Mode.SUBTRACT)


solid = body_2.part
